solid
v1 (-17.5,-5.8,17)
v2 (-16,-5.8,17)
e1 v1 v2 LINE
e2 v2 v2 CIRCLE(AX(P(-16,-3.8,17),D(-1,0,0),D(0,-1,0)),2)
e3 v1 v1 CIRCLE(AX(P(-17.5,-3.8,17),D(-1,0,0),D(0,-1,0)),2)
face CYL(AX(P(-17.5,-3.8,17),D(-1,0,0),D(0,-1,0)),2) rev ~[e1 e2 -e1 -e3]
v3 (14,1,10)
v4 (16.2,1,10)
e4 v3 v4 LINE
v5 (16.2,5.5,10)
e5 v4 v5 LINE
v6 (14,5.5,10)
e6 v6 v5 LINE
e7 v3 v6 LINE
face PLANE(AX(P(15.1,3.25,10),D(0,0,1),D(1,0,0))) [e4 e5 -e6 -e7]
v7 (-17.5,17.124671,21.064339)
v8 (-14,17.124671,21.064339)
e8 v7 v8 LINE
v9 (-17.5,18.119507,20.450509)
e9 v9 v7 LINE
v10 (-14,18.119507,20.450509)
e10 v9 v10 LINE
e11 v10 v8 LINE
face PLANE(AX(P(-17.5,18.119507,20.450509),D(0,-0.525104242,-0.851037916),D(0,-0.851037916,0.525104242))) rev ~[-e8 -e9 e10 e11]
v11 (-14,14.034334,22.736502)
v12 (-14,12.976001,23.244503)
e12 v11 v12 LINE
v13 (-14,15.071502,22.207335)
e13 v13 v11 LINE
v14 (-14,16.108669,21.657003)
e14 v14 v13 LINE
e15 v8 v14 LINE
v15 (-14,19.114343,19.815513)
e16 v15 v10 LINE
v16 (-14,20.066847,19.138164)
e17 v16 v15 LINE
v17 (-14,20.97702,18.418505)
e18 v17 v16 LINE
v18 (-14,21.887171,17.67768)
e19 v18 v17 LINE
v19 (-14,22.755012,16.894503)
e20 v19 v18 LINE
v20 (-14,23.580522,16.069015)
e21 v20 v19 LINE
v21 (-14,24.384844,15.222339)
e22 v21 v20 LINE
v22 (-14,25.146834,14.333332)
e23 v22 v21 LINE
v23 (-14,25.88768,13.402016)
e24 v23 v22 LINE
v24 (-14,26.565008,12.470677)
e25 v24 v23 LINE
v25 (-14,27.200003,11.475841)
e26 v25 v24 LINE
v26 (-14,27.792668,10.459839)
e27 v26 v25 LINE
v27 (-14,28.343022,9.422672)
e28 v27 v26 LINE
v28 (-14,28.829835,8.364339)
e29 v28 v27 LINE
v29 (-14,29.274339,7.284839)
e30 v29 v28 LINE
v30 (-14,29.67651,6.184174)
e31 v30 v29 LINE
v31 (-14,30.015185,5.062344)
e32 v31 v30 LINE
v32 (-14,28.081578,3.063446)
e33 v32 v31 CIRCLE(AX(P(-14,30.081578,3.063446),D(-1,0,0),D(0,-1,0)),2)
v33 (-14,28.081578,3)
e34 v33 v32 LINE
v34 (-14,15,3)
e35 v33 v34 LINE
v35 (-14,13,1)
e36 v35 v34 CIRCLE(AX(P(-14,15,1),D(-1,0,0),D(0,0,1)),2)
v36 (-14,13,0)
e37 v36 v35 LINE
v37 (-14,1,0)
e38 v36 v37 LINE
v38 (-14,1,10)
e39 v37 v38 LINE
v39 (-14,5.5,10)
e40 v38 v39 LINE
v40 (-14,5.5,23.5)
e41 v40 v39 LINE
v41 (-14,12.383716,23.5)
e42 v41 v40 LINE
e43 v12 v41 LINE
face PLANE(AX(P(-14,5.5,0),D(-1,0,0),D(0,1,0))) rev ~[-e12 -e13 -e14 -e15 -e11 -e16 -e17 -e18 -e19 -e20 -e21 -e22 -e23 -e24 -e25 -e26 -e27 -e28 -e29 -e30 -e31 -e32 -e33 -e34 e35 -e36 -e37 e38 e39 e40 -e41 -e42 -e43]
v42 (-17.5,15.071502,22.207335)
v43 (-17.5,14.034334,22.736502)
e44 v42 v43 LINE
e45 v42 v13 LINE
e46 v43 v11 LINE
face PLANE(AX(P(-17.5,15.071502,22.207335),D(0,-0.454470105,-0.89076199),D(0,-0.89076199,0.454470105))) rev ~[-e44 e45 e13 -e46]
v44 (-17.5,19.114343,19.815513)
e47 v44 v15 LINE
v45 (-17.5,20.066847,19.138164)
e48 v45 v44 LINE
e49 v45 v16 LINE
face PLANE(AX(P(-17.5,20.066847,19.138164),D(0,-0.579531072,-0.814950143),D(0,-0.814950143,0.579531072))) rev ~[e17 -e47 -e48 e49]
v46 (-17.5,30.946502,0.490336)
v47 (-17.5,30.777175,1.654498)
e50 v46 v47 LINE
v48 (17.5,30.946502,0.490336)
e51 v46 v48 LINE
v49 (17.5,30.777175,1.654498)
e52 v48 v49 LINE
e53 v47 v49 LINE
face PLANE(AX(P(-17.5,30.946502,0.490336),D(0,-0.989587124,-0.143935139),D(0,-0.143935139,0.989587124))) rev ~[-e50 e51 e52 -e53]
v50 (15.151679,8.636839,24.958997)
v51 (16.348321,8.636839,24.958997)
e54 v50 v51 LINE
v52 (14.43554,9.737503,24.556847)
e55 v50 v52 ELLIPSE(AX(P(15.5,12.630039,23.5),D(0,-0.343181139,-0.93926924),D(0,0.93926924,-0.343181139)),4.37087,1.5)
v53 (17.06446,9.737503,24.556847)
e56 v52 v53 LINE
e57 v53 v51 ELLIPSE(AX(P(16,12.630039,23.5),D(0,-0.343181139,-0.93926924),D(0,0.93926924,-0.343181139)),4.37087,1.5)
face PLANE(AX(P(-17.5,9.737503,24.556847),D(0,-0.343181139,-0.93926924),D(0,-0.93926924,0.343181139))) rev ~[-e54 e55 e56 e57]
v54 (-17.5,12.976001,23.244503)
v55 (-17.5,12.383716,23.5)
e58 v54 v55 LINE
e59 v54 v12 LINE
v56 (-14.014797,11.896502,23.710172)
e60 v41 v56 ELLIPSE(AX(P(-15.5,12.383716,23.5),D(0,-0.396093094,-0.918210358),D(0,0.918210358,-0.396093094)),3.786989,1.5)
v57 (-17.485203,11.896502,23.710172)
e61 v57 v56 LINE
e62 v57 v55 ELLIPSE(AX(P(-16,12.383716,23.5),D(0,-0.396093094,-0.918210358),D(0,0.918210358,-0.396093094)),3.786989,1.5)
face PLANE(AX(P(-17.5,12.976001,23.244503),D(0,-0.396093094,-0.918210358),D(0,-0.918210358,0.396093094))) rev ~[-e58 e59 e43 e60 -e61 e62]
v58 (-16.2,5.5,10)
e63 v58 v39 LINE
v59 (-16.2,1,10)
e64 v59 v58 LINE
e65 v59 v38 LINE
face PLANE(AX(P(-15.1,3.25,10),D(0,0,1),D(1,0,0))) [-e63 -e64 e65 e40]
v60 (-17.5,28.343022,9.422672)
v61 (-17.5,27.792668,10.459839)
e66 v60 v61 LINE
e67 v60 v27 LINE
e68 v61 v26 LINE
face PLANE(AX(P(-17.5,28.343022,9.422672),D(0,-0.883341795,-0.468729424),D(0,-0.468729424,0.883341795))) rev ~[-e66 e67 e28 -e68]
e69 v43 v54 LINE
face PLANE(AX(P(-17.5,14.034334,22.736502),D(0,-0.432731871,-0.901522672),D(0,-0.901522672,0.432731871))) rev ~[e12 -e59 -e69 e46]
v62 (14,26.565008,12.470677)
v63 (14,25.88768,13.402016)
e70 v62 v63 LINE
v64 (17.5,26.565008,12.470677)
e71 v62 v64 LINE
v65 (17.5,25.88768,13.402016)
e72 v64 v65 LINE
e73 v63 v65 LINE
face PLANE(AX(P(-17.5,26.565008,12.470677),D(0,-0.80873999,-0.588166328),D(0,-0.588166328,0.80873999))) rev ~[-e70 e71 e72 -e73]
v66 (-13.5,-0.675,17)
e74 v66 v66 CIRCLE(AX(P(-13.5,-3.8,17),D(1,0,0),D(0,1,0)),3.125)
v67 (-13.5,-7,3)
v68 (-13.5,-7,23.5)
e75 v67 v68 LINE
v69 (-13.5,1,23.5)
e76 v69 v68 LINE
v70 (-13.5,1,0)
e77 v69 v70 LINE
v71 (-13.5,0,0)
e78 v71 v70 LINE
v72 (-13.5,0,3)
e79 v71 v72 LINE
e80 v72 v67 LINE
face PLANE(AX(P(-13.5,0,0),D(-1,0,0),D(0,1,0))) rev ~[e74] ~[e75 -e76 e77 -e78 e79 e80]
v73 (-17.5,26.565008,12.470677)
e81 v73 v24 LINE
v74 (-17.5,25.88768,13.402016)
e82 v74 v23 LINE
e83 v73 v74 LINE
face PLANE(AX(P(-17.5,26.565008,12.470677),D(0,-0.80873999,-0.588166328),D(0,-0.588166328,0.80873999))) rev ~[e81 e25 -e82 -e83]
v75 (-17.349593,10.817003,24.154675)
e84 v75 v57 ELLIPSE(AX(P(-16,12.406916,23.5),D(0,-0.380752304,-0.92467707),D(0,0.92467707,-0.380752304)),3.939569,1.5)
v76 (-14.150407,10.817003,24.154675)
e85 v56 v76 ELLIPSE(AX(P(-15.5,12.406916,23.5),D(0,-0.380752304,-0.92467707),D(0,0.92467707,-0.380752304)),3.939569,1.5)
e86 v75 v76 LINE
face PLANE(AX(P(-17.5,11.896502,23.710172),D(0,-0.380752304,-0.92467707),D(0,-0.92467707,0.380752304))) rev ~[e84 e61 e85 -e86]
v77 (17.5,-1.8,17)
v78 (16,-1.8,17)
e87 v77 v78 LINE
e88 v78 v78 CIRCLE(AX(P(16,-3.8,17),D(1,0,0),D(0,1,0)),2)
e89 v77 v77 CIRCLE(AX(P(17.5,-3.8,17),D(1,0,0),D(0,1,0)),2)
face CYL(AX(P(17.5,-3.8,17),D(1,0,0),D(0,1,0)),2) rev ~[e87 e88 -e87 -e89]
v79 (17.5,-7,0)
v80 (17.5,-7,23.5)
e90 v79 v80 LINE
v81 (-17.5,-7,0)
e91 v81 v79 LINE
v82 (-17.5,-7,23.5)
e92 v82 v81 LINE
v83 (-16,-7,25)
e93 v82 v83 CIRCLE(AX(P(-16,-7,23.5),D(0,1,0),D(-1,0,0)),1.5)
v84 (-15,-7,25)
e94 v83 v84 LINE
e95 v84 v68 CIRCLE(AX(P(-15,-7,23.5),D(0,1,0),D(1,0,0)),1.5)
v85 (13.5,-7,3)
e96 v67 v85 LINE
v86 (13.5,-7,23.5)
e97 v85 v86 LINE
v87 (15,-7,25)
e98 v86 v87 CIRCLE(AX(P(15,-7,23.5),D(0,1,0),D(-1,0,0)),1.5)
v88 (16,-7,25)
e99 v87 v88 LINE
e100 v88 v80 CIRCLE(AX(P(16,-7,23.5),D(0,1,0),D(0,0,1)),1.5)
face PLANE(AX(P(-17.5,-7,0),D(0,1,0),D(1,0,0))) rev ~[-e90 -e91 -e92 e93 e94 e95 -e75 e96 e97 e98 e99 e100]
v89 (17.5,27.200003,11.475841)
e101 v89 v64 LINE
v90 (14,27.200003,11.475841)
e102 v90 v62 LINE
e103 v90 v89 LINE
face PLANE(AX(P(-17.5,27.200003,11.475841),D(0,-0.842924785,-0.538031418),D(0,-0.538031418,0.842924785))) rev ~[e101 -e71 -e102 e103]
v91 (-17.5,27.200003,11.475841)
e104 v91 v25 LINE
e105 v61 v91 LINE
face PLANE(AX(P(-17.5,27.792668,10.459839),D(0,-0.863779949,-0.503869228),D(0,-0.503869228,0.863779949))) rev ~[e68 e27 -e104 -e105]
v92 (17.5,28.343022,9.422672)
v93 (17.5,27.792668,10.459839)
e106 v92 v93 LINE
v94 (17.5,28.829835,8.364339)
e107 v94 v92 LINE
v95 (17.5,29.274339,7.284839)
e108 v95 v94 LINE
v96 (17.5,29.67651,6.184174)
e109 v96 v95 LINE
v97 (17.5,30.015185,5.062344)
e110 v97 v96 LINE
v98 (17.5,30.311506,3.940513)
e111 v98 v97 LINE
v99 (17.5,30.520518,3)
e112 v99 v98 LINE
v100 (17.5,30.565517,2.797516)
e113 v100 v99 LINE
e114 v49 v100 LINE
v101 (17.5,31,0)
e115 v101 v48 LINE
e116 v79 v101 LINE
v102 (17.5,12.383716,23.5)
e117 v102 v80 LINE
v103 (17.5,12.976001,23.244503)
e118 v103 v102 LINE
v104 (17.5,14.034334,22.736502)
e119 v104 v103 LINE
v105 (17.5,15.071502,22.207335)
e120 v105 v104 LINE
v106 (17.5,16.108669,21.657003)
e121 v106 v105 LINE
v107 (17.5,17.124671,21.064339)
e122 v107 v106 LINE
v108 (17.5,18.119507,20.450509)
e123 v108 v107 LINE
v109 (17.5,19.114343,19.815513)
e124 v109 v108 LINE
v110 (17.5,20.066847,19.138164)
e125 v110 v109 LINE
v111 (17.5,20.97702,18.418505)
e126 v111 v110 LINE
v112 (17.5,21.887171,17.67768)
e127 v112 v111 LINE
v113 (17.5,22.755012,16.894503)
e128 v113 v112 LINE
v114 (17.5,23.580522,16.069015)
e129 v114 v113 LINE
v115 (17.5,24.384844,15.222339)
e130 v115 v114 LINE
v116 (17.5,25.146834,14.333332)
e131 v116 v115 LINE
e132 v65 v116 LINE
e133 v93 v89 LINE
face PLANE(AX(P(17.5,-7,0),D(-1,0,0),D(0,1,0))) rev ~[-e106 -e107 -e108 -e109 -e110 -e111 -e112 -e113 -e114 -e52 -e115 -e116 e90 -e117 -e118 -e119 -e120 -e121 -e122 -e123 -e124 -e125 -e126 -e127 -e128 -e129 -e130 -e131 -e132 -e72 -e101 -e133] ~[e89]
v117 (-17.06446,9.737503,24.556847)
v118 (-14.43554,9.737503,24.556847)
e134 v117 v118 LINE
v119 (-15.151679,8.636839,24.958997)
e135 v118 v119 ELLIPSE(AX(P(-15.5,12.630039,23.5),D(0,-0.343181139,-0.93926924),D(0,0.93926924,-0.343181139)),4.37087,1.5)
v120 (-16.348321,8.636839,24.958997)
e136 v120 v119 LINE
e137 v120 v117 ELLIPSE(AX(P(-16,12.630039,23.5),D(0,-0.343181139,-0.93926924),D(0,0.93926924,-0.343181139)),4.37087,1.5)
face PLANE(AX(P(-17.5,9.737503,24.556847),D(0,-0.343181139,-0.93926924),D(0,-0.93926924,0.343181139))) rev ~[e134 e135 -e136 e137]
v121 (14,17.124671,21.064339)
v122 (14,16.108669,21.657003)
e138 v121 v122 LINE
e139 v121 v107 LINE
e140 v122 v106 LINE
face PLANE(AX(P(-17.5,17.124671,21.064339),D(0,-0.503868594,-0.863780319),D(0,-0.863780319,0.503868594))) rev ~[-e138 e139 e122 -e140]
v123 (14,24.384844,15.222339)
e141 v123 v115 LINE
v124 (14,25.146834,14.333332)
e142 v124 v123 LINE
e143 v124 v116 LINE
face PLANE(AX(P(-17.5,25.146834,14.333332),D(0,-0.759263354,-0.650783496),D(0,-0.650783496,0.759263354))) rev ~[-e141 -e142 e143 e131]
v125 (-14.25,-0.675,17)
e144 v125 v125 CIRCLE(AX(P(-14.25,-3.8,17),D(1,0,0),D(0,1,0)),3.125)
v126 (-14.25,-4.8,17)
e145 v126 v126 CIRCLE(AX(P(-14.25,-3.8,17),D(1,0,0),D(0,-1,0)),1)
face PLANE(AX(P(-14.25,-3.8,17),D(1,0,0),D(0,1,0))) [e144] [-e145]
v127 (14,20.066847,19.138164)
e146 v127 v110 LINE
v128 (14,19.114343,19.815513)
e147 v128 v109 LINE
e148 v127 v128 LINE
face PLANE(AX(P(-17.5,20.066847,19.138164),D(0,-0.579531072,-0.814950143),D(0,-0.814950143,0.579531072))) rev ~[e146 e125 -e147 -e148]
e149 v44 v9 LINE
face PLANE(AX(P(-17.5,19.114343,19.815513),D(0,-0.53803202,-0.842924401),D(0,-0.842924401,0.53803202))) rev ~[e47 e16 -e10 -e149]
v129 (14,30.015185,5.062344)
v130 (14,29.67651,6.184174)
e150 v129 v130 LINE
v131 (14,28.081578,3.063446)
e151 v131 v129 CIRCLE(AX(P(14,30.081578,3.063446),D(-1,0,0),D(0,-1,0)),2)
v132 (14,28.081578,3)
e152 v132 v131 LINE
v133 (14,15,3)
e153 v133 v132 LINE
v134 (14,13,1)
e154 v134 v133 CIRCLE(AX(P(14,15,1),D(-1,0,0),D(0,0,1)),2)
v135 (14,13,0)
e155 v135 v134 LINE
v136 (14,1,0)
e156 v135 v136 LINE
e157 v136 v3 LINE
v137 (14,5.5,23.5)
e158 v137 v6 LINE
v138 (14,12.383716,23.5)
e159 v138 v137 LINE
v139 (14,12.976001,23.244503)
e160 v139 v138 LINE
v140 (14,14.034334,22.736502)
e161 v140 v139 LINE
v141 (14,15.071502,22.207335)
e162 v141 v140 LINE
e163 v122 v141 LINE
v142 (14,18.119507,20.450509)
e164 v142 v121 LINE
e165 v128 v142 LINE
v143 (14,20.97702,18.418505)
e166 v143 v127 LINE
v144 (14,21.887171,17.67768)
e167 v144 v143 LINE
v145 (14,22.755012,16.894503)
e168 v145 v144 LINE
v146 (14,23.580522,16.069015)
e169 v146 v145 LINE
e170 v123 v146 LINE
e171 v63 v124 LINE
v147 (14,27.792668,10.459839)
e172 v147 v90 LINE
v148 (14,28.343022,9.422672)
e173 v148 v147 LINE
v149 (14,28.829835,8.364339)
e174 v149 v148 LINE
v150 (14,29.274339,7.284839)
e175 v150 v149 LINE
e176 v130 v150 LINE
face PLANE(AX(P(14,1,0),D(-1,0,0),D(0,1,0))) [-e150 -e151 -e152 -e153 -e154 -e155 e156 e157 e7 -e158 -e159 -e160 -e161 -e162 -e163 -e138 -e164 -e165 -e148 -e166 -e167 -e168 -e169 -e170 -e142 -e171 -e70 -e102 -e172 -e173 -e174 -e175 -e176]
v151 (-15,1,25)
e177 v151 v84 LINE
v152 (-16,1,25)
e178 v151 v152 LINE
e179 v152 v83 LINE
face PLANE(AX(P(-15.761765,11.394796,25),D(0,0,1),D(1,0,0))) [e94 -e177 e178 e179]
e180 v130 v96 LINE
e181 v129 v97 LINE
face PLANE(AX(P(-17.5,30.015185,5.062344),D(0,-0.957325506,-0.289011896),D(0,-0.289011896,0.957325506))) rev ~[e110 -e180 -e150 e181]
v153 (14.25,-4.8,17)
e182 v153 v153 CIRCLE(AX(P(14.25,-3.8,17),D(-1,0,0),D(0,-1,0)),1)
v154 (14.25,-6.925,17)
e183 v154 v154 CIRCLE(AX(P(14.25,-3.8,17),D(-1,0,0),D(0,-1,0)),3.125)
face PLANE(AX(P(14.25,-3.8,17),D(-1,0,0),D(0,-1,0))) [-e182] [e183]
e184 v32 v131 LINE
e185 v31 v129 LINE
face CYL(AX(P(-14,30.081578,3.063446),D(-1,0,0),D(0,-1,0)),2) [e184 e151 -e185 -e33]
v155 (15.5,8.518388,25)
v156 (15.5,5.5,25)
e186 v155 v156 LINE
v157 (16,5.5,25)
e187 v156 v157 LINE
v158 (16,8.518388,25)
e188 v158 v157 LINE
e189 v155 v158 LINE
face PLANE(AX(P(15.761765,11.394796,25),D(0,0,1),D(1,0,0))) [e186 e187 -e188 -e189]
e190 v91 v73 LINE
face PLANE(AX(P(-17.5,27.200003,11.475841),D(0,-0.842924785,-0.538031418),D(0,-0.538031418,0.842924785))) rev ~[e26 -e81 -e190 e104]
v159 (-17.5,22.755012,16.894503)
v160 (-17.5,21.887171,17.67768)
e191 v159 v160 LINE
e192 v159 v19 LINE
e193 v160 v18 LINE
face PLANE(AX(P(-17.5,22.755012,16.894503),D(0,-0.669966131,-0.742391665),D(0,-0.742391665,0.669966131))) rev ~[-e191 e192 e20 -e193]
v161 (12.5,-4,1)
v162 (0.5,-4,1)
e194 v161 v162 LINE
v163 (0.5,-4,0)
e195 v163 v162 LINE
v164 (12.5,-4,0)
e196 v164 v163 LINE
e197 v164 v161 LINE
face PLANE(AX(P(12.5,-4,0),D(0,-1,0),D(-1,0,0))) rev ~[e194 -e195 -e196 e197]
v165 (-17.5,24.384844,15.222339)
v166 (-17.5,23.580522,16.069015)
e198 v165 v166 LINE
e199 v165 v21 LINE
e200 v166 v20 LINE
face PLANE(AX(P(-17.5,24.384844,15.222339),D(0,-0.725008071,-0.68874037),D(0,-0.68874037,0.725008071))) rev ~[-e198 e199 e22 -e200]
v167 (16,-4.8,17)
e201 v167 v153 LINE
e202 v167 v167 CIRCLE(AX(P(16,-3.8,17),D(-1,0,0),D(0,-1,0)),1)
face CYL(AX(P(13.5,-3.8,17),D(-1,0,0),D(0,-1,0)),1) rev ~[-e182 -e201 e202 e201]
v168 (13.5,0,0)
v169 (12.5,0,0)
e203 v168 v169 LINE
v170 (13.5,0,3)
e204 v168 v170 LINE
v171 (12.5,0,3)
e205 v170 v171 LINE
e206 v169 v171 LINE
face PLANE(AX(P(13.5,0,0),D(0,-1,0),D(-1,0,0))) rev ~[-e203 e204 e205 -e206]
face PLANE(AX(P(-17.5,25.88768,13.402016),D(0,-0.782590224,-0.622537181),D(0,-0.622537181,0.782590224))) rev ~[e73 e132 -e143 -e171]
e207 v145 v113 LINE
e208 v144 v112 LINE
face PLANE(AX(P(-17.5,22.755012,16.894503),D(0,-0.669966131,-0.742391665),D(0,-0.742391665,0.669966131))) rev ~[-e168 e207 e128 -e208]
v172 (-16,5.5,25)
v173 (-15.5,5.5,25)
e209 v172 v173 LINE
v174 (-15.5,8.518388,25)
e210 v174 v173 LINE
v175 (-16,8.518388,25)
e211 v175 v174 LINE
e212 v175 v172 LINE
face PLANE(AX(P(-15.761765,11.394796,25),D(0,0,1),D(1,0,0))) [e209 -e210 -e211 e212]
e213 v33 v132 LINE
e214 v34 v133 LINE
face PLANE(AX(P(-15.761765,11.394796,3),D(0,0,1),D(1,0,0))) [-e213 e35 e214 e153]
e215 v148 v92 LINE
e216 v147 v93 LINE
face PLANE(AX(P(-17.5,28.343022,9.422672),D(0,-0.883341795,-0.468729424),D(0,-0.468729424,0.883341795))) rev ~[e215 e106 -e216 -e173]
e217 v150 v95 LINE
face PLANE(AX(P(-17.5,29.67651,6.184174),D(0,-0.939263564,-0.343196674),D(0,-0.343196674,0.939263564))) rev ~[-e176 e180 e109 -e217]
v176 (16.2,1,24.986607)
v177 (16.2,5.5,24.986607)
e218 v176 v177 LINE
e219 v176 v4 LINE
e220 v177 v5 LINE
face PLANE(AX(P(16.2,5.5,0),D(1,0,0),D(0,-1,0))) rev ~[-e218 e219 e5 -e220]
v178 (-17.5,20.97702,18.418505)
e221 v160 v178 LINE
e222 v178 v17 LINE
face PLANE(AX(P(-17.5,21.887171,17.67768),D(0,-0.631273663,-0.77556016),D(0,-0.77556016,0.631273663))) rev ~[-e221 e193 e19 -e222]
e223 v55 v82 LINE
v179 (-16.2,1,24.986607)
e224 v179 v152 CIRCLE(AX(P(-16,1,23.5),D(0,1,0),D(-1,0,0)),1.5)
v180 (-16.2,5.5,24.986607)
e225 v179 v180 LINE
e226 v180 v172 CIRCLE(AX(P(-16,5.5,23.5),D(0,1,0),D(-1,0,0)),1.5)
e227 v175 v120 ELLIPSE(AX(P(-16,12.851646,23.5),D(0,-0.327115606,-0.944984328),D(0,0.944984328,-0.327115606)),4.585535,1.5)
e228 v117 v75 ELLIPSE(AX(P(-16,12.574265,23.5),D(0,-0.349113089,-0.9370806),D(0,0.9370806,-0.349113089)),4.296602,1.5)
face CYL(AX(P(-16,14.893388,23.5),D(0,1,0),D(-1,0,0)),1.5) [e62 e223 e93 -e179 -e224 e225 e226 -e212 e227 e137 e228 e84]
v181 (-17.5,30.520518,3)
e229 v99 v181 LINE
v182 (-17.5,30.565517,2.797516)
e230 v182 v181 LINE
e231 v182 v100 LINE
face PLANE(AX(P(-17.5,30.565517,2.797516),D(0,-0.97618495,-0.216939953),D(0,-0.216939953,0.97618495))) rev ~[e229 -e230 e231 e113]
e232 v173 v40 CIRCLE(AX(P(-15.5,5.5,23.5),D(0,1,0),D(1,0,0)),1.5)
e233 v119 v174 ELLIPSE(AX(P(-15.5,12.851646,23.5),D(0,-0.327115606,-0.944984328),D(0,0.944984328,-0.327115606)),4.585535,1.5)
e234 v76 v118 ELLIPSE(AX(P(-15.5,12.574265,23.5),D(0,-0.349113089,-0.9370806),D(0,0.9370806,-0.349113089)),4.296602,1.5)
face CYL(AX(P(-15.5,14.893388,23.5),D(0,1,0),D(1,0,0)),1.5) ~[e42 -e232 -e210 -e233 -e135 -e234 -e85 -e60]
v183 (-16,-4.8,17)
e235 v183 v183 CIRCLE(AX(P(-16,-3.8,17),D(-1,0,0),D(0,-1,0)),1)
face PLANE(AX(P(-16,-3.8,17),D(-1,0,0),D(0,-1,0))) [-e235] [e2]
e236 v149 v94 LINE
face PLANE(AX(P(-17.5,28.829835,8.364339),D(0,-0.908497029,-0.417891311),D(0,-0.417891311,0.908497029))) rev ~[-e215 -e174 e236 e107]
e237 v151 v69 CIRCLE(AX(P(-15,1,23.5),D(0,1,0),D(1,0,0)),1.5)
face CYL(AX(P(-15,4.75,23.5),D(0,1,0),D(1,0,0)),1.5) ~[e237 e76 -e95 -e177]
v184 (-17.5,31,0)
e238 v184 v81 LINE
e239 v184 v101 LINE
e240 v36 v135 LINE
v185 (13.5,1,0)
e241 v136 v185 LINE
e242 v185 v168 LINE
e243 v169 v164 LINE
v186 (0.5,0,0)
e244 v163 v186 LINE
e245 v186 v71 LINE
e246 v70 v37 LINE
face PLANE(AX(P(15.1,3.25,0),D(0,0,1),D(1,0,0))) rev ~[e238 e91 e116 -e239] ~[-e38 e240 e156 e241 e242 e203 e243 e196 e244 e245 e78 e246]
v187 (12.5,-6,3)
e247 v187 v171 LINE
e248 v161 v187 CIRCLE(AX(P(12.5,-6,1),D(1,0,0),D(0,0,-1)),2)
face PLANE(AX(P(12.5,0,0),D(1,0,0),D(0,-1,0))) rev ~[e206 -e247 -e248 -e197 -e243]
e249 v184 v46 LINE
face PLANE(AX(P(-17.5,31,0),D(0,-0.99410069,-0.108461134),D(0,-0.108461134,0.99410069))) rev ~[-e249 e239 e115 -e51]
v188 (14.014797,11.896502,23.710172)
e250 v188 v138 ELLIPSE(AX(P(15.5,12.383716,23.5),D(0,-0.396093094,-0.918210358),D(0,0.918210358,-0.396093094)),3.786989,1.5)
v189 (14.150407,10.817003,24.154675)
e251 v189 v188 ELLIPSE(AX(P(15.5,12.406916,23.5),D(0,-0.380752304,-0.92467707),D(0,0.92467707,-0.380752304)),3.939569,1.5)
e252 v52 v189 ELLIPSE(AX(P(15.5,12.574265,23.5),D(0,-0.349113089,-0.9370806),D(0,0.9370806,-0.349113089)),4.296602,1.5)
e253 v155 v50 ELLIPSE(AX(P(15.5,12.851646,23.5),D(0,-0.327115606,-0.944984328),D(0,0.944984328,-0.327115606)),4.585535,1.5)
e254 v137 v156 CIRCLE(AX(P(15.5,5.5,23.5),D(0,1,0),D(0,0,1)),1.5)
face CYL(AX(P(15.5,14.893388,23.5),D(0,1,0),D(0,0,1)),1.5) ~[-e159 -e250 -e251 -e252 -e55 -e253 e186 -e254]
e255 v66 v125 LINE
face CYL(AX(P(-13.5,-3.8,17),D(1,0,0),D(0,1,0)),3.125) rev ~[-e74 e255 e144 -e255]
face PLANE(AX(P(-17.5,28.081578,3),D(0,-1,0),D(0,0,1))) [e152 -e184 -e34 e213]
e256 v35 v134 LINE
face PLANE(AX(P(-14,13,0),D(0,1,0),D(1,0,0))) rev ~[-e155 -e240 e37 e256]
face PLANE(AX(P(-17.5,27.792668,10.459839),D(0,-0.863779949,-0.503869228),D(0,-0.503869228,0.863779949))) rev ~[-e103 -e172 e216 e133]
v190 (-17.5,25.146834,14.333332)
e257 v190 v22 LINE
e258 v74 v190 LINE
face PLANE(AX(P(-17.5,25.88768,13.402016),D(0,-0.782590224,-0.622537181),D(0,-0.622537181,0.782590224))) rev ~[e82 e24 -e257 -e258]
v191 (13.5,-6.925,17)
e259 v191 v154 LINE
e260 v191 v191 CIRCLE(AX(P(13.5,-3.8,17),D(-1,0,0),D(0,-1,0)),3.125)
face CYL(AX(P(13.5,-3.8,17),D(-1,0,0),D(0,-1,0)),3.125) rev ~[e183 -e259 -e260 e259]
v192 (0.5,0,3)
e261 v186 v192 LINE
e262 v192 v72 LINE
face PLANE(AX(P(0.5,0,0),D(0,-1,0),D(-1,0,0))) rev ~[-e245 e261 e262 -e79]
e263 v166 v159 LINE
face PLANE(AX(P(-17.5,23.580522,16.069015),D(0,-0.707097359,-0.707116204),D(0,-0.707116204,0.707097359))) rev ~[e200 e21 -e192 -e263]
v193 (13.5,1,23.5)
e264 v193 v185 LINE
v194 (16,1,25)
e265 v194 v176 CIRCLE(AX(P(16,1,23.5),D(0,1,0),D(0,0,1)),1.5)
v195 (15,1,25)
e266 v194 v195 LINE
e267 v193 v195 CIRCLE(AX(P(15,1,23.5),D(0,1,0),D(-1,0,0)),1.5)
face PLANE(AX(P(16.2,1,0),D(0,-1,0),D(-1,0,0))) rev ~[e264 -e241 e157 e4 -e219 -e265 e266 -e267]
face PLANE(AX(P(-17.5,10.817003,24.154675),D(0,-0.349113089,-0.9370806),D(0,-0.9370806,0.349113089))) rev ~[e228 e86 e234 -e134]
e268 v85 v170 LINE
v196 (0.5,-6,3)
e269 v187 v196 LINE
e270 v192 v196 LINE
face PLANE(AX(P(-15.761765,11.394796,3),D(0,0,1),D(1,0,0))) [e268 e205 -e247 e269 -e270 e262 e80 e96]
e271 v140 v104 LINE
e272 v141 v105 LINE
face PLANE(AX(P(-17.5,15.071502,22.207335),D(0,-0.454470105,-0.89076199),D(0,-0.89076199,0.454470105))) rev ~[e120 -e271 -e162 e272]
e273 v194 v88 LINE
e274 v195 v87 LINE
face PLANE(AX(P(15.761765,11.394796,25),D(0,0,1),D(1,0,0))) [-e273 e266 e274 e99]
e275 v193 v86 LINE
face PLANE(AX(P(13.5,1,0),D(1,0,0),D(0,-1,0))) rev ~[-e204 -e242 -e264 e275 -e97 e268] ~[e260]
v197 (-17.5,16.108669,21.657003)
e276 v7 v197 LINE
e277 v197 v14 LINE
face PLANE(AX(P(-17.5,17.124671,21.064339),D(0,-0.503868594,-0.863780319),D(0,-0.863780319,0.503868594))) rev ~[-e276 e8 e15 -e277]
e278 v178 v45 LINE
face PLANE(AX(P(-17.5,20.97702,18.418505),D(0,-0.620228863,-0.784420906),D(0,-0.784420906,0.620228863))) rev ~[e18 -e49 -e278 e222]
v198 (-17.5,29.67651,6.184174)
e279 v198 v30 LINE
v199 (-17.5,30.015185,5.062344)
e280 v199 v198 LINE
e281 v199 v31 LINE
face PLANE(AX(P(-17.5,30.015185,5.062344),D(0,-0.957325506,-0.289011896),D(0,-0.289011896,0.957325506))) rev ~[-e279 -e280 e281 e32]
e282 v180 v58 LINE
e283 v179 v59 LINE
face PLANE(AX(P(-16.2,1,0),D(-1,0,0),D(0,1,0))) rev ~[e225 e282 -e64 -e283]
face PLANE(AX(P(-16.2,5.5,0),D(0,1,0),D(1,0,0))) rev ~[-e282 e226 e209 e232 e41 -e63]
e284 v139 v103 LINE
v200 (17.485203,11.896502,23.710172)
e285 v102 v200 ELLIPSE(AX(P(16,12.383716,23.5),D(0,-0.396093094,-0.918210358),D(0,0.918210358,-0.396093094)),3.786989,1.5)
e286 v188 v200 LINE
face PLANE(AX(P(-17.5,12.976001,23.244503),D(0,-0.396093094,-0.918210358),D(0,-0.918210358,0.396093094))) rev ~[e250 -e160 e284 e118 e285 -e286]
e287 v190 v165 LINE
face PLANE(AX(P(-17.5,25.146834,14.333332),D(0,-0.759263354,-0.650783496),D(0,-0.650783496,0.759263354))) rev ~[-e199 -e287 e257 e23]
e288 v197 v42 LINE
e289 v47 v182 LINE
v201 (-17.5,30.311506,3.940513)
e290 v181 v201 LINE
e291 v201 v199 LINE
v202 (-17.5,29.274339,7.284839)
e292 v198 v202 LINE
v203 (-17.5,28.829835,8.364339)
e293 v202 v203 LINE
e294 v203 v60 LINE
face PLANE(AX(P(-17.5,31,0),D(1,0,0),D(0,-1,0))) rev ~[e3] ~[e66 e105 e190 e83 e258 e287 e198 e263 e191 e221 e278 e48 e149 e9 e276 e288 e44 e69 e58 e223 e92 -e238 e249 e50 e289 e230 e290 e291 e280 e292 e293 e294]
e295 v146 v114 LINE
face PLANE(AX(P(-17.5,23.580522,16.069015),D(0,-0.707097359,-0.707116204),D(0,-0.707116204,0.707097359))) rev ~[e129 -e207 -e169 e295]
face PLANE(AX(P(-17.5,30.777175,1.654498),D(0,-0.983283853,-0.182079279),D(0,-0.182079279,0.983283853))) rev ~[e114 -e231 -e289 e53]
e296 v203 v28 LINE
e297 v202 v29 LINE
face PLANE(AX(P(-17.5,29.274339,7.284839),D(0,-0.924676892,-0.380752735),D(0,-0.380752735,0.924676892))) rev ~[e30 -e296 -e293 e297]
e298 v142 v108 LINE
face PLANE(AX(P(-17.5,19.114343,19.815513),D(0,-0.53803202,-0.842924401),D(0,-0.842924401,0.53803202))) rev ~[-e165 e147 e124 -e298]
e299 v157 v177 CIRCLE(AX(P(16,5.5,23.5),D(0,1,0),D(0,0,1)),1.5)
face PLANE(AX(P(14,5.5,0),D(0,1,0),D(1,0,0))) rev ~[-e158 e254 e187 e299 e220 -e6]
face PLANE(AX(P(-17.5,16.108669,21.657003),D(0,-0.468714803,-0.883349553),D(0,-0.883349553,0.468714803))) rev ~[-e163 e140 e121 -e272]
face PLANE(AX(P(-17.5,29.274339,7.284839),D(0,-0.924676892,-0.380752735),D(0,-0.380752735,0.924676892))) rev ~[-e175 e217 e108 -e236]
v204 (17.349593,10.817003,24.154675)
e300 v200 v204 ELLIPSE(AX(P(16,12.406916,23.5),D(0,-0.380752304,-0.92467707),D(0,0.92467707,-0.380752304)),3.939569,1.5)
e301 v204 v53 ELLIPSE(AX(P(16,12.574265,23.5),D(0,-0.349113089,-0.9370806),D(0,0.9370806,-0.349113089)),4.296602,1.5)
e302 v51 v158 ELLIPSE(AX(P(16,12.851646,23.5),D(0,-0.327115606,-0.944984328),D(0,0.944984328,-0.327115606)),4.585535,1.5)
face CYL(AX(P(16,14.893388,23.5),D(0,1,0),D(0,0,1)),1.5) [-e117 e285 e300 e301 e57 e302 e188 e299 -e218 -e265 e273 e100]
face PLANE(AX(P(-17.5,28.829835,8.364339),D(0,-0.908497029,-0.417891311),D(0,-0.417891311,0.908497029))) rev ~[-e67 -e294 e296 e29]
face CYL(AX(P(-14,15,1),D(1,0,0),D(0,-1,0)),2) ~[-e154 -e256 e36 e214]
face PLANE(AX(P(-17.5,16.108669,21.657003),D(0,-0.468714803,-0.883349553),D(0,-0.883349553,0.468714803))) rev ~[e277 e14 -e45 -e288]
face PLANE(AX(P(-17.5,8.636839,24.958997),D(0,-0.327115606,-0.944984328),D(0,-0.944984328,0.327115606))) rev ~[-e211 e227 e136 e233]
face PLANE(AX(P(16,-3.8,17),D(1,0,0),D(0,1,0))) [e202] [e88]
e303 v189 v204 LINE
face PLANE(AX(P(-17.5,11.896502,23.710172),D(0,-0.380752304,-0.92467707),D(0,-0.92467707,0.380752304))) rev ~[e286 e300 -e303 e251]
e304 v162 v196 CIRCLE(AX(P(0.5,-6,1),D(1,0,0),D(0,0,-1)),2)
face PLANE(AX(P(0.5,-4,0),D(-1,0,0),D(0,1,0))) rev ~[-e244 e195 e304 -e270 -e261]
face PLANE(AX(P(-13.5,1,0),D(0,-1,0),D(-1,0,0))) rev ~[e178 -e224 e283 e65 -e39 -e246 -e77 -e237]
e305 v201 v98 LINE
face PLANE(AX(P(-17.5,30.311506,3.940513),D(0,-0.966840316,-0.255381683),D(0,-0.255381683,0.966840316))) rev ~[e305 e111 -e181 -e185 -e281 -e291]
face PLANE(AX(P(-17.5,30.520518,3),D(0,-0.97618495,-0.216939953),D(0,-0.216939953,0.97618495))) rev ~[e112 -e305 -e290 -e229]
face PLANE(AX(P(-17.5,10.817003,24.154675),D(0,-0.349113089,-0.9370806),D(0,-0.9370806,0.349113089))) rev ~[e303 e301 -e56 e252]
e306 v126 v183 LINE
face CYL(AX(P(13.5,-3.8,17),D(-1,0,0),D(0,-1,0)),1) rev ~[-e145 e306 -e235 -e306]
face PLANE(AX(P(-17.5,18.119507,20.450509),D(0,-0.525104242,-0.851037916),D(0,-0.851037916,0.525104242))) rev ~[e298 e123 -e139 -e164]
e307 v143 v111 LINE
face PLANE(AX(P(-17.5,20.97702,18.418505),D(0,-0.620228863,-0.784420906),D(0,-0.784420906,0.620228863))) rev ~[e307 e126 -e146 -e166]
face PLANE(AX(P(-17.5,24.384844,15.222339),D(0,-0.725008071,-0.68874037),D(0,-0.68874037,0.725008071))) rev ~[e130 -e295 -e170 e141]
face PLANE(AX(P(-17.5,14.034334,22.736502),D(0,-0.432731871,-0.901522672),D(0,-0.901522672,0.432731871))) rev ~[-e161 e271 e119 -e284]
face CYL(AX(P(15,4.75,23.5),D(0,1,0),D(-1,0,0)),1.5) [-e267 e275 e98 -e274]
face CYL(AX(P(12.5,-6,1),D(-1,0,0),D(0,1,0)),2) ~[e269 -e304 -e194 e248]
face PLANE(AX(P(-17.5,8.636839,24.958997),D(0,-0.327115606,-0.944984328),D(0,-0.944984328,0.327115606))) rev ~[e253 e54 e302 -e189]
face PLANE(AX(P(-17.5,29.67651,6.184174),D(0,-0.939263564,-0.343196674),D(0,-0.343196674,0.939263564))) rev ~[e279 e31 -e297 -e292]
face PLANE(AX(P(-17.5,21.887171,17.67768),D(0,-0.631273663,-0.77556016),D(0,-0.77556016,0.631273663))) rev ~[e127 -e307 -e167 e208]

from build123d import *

# Parameters (mm, degrees)
F0_W         = 28
F0_H         = 18
F1_DEPTH     = 3
F2_DEPTH     = 25
F3_R         = 2
F4_R         = 1
F5_DEPTH     = 50
F0_W_2       = 2.2
F0_H_2       = 4.5
F6_DEPTH     = 10
F9_DEPTH     = 100
F4_R_2       = 3.125
F10_R        = 3.125
F10_R_2      = 1
F11_DEPTH    = 0.75
F12_T1_DEPTH = 25.6433879336
F12_T3_DEPTH = 13.1433879336
F12_T5_DEPTH = 15.5
F13_DEPTH    = 35
F14_DEPTH    = 39
F15_T1_DEPTH = 28
F7_R         = 2
F7_R_2       = 1
F8_R         = 2
F8_R_2       = 1
F16_DEPTH    = 1.5


# Not quite as in the source:
# - a fillet or chamfer that OpenCascade refuses, or shapes differently, is made with other operations: its cross-section is extruded or revolved along the edge and cut away or added


with BuildPart() as f1:
    # F0 (on Top) → F1 (new body)
    with BuildSketch(Plane.XY):
        Polygon((-17.5, 0), (-17.5, -7), (-13.5, -7), (-13.5, 0), (-13.5, 1), (-14, 1), (-16.2, 1), (-16.2, 5.5), (-14, 5.5), (-14, 13), (-14, 31), (-17.5, 31), align=None)
        Polygon((-13.5, 0), (-13.5, -7), (13.5, -7), (13.5, 0), (12.5, 0), (12.5, -4), (0.5, -4), (0.5, 0), align=None)
        Polygon((13.5, 0), (13.5, -7), (17.5, -7), (17.5, 0), (17.5, 31), (14, 31), (14, 13), (14, 5.5), (16.2, 5.5), (16.2, 1), (14, 1), (13.5, 1), align=None)
        with Locations((0, 22)):
            Rectangle(F0_W, F0_H)
    extrude(amount=F1_DEPTH)

    # F0 (on Top) → F2 (join)
    with BuildSketch(Plane.XY):
        Polygon((-17.5, 0), (-17.5, -7), (-13.5, -7), (-13.5, 0), (-13.5, 1), (-14, 1), (-16.2, 1), (-16.2, 5.5), (-14, 5.5), (-14, 13), (-14, 31), (-17.5, 31), align=None)
        Polygon((13.5, 0), (13.5, -7), (17.5, -7), (17.5, 0), (17.5, 31), (14, 31), (14, 13), (14, 5.5), (16.2, 5.5), (16.2, 1), (14, 1), (13.5, 1), align=None)
    extrude(amount=F2_DEPTH)

    # F3
    f3_edges = [f1.edges().sort_by_distance(p)[0] for p in [
        (0, 13, 3),
        (6.5, -4, 3),
    ]]
    fillet(f3_edges, radius=F3_R)

    # F4 (on face) → F5 (cut, symmetric)
    with BuildSketch(Plane(origin=(13.5, 0, 0), x_dir=(0, -1, 0), z_dir=(-1, 0, 0))):
        with Locations((3.8, 17)):
            Circle(F4_R)
    extrude(amount=F5_DEPTH, both=True, mode=Mode.SUBTRACT)

    # F0 (on Top) → F6 (join)
    with BuildSketch(Plane.XY):
        with Locations((15.1, 3.25)):
            Rectangle(F0_W_2, F0_H_2)
        with Locations((-15.1, 3.25)):
            Rectangle(F0_W_2, F0_H_2)
    extrude(amount=F6_DEPTH)

    # F7 (on face) → F9 (cut)
    with BuildSketch(Plane(origin=(-17.5, 0, 0), x_dir=(0, -1, 0), z_dir=(-1, 0, 0))):
        Polygon((-31, 25), (-31, 3), (-30.5205184888, 3), (-30.311506, 3.940513), (-30.015185, 5.062344), (-29.67651, 6.184174), (-29.274339, 7.284839), (-28.829835, 8.364339), (-28.343022, 9.422672), (-27.792668, 10.459839), (-27.200003, 11.475841), (-26.565008, 12.470677), (-25.88768, 13.402016), (-25.146834, 14.333332), (-24.384844, 15.222339), (-23.580522, 16.069015), (-22.755012, 16.894503), (-21.887171, 17.67768), (-20.97702, 18.418505), (-20.066847, 19.138164), (-19.114343, 19.815513), (-18.119507, 20.450509), (-17.124671, 21.064339), (-16.108669, 21.657003), (-15.071502, 22.207335), (-14.034334, 22.736502), (-12.976001, 23.244503), (-11.896502, 23.710172), (-10.817003, 24.154675), (-9.737503, 24.556847), (-8.636839, 24.958997), (-8.5183879336, 25), align=None)
    extrude(amount=-F9_DEPTH, mode=Mode.SUBTRACT)

    # F4 (on face) + F10 (on face) → F11 (cut, symmetric)
    with BuildSketch(Plane(origin=(13.5, 0, 0), x_dir=(0, -1, 0), z_dir=(-1, 0, 0))):
        with Locations((3.8, 17)):
            Circle(F4_R_2)
        with Locations((3.8, 17)):
            Circle(F4_R, mode=Mode.SUBTRACT)
    with BuildSketch(Plane.YZ.offset(-13.5)):
        with Locations((-3.8, 17)):
            Circle(F10_R)
        with Locations((-3.8, 17)):
            Circle(F10_R_2, mode=Mode.SUBTRACT)
    extrude(amount=F11_DEPTH, both=True, dir=(-1, 0, 0), mode=Mode.SUBTRACT)

    # F12: fillet of radius 1.5 on 6 edges, made by hand

    # F12_s2 → F12_t1 (cut)
    with BuildSketch(Plane.XZ.offset(-14.8933879336)):
        with BuildLine():
            ThreePointArc((16, 25), (17.0606601718, 24.5606601718), (17.5, 23.5))
            Line((17.5, 23.5), (17.5, 25))
            Line((17.5, 25), (16, 25))
        make_face()
        with BuildLine():
            ThreePointArc((-17.5, 23.5), (-17.0606601718, 24.5606601718), (-16, 25))
            Line((-16, 25), (-17.5, 25))
            Line((-17.5, 25), (-17.5, 23.5))
        make_face()
    extrude(amount=F12_T1_DEPTH, mode=Mode.SUBTRACT)

    # F12_s4 → F12_t3 (cut)
    with BuildSketch(Plane.XZ.offset(-14.8933879336)):
        with BuildLine():
            ThreePointArc((15.5, 25), (14.4393398282, 24.5606601718), (14, 23.5))
            Line((14, 23.5), (14, 25))
            Line((14, 25), (15.5, 25))
        make_face()
        with BuildLine():
            ThreePointArc((-14, 23.5), (-14.4393398282, 24.5606601718), (-15.5, 25))
            Line((-15.5, 25), (-14, 25))
            Line((-14, 25), (-14, 23.5))
        make_face()
    extrude(amount=F12_T3_DEPTH, mode=Mode.SUBTRACT)

    # F12_s6 → F12_t5 (cut)
    with BuildSketch(Plane.XZ.offset(-4.75)):
        with BuildLine():
            ThreePointArc((13.5, 23.5), (13.9393398282, 24.5606601718), (15, 25))
            Line((15, 25), (13.5, 25))
            Line((13.5, 25), (13.5, 23.5))
        make_face()
        with BuildLine():
            ThreePointArc((-13.5, 23.5), (-13.9393398282, 24.5606601718), (-15, 25))
            Line((-15, 25), (-13.5, 25))
            Line((-13.5, 25), (-13.5, 23.5))
        make_face()
    extrude(amount=F12_T5_DEPTH, mode=Mode.SUBTRACT)

    # F7 (on face) → F13 (join)
    with BuildSketch(Plane(origin=(-17.5, 0, 0), x_dir=(0, -1, 0), z_dir=(-1, 0, 0))):
        Polygon((-30.311506, 3.940513), (-30.5205184888, 3), (-28.0815777779, 3), (-28.0815777779, 5.062344), (-30.015185, 5.062344), align=None)
    extrude(amount=-F13_DEPTH)

    # F7 (on face) → F14 (cut)
    with BuildSketch(Plane(origin=(-17.5, 0, 0), x_dir=(0, -1, 0), z_dir=(-1, 0, 0))):
        Polygon((-31, 3), (-31, 0), (-30.946502, 0.490336), (-30.777175, 1.654498), (-30.565517, 2.797516), (-30.5205184888, 3), align=None)
    extrude(amount=-F14_DEPTH, mode=Mode.SUBTRACT)

    # F15: fillet of radius 2 on 1 edges, made by hand

    # F15_s2 → F15_t1 (cut)
    with BuildSketch(Plane.YZ.offset(-14)):
        with BuildLine():
            ThreePointArc((28.0815777779, 3.063446304), (28.6440824638, 4.4539883645), (30.015185, 5.062344))
            Line((30.015185, 5.062344), (28.0815777779, 5.062344))
            Line((28.0815777779, 5.062344), (28.0815777779, 3.063446304))
        make_face()
    extrude(amount=F15_T1_DEPTH, mode=Mode.SUBTRACT)

    # F7 (on face) + F8 (on face) → F16 (cut, symmetric)
    with BuildSketch(Plane(origin=(-17.5, 0, 0), x_dir=(0, -1, 0), z_dir=(-1, 0, 0))):
        with Locations((3.8, 17)):
            Circle(F7_R)
        with Locations((3.8, 17)):
            Circle(F7_R_2, mode=Mode.SUBTRACT)
    with BuildSketch(Plane.YZ.offset(17.5)):
        with Locations((-3.8, 17)):
            Circle(F8_R)
        with Locations((-3.8, 17)):
            Circle(F8_R_2, mode=Mode.SUBTRACT)
    extrude(amount=F16_DEPTH, both=True, dir=(-1, 0, 0), mode=Mode.SUBTRACT)


solid = f1.part
